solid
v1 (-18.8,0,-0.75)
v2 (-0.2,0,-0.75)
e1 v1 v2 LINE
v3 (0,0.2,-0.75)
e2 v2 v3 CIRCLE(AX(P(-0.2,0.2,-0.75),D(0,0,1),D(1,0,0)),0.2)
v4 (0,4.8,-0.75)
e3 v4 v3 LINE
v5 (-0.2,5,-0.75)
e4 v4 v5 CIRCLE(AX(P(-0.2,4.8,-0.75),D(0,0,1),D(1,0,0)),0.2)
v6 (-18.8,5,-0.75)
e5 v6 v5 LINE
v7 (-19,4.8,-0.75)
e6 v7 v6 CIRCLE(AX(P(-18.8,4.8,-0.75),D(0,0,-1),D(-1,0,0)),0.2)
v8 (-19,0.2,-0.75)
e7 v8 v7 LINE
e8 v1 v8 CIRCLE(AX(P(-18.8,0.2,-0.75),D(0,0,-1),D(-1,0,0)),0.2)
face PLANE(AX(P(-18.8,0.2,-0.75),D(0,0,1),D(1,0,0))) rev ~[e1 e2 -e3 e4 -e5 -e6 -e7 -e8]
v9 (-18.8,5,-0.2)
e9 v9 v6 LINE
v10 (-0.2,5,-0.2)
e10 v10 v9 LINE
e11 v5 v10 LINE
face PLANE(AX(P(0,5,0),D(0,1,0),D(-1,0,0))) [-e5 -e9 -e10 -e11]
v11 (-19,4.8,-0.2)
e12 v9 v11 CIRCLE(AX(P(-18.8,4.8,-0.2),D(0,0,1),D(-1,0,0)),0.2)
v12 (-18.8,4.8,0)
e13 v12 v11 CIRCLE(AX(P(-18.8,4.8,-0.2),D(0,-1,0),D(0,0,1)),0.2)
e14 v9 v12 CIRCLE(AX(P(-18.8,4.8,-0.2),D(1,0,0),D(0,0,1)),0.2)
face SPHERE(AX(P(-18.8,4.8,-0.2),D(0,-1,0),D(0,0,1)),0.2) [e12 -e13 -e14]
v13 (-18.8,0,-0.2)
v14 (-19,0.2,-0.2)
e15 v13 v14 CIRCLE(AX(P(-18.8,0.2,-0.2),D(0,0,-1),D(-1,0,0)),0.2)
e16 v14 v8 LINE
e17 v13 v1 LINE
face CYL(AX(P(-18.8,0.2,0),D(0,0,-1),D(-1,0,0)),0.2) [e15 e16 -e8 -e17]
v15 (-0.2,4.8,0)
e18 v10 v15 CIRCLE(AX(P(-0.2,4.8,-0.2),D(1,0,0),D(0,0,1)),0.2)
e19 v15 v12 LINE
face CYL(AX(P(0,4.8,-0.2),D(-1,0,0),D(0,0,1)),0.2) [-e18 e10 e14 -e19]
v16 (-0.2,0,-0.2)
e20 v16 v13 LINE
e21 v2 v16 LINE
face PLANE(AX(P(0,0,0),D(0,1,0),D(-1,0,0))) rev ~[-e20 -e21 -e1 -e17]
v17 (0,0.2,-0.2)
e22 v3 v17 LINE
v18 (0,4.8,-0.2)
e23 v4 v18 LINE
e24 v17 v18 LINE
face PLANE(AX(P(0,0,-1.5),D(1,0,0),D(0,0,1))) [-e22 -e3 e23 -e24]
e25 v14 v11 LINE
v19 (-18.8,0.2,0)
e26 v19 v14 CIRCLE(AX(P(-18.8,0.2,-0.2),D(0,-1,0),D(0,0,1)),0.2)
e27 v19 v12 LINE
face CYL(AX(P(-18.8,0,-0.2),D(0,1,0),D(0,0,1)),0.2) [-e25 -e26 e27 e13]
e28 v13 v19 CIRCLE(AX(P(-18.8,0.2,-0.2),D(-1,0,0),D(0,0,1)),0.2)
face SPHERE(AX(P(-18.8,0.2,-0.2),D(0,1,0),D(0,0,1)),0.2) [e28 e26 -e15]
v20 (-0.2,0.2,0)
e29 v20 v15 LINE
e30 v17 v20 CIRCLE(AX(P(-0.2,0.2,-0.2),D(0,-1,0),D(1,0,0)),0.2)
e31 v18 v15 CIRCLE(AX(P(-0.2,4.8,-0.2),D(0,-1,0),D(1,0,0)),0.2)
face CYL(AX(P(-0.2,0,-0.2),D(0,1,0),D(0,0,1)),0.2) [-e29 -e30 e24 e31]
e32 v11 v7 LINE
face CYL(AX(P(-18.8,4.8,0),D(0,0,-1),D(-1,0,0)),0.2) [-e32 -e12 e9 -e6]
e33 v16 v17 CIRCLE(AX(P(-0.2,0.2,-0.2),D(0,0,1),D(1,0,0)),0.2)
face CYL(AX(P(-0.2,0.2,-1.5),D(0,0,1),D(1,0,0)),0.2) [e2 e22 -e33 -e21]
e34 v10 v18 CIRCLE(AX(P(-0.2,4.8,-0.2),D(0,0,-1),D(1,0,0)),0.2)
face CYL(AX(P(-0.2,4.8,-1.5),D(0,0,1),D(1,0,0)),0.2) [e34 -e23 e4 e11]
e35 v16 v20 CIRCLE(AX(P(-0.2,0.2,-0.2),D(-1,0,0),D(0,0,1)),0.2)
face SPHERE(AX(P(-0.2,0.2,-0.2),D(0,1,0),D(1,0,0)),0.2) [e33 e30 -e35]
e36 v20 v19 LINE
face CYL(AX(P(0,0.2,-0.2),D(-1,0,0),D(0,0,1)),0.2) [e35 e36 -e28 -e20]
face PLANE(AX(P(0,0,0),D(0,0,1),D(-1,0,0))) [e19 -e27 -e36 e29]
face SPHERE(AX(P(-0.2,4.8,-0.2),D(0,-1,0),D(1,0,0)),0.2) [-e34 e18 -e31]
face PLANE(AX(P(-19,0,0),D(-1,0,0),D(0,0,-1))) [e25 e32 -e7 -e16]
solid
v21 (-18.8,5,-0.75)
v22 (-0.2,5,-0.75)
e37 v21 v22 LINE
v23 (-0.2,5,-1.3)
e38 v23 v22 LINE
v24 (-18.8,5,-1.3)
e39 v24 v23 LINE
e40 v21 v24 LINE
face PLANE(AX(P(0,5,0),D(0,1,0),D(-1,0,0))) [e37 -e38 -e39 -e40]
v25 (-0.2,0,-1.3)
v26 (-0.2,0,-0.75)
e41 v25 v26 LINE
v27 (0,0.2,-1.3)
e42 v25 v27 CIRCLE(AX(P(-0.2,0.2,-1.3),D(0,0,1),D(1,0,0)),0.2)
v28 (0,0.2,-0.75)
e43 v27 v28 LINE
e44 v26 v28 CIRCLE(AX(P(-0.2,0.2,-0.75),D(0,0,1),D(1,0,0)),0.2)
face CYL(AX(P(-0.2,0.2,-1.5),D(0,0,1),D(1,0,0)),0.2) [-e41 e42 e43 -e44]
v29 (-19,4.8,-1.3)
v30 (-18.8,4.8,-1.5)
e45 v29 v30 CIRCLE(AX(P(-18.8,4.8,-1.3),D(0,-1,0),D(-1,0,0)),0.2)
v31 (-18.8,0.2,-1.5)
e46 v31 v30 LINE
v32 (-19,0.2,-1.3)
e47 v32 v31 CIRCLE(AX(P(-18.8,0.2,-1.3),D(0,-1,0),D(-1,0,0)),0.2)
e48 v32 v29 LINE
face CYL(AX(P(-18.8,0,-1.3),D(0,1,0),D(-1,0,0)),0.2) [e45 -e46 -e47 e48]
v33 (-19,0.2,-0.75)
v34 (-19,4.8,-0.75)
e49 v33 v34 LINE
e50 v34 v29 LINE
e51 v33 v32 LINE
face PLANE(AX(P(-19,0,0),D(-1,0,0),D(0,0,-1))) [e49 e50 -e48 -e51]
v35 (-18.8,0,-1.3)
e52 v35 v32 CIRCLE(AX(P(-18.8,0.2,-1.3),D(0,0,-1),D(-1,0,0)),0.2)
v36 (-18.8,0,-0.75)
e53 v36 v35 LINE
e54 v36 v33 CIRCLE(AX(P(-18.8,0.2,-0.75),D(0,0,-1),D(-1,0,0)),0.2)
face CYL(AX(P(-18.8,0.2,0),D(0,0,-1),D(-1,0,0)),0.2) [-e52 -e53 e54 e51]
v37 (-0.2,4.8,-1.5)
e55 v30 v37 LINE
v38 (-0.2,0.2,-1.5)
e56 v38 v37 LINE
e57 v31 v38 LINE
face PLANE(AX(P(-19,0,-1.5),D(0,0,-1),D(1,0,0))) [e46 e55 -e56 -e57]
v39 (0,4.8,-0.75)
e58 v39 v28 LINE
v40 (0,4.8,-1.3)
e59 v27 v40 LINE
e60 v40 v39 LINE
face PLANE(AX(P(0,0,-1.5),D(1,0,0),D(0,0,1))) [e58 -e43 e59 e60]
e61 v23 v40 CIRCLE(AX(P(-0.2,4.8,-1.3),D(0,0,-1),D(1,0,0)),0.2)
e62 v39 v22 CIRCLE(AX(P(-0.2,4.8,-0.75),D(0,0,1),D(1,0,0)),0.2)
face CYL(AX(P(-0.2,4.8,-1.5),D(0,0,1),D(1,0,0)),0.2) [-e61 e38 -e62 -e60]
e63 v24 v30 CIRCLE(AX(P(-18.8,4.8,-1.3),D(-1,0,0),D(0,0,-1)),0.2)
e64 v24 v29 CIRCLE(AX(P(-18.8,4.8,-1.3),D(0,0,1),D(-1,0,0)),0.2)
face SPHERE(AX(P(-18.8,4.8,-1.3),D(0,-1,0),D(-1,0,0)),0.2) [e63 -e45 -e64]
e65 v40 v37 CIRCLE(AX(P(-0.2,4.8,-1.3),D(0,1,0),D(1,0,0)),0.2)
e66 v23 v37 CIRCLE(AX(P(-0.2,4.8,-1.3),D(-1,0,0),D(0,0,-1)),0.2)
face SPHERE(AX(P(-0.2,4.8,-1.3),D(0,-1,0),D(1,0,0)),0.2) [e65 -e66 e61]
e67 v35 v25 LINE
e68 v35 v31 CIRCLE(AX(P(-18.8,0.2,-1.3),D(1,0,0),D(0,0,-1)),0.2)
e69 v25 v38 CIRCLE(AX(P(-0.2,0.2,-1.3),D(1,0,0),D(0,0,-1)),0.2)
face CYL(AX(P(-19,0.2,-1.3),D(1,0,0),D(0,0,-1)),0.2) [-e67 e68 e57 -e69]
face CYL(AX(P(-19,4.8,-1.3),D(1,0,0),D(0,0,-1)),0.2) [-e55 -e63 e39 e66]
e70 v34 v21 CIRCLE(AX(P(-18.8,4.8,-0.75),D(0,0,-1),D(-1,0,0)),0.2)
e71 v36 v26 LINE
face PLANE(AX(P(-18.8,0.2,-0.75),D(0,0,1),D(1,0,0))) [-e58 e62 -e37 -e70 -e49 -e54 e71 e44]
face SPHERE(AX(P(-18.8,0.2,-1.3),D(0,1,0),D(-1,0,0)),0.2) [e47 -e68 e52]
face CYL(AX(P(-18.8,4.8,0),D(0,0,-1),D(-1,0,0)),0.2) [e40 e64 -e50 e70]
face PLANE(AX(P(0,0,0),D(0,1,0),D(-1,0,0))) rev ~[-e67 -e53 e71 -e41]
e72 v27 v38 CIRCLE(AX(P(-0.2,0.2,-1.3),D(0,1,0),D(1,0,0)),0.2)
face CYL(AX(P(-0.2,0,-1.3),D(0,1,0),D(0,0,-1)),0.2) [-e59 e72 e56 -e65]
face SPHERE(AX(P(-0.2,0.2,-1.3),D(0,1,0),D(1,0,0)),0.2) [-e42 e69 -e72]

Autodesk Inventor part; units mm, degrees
ref_plane "YZ Plane" through (0, 0, 0) normal (1, 0, 0) x (0, 1, 0)
ref_plane "XZ Plane" through (0, 0, 0) normal (0, 1, 0) x (-1, 0, 0)
sketch "Sketch1" plane through (0, 0, 0) normal (0, 1, 0) x (-1, 0, 0)
  line L0 (0, 0) -> (19, 0)
  line L1 (19, 0) -> (19, -1.5)
  line L2 (19, -1.5) -> (0, -1.5)
  line L3 (0, -1.5) -> (0, 0)
  dimension "d0" = 19
  dimension "d1" = 1.5
extrude "Extrusion1" add sketch "Sketch1" along normal blind 5
fillet "Fillet1" radius 0.2 12 edges at (0, 2.5, 0) (0, 2.5, -1.5) (0, 0, -0.75) (0, 5, -0.75) (-19, 2.5, 0) (-9.5, 0, 0) (-9.5, 5, 0) (-19, 2.5, -1.5) (-19, 0, -0.75) (-19, 5, -0.75) (-9.5, 0, -1.5) (-9.5, 5, -1.5)
ref_plane "Work Plane1" through (-18.8, 0.2, -0.75) normal (0, 0, 1) x (1, 0, 0)
split body "Split1" result two bodies by plane through (-18.8, 0.2, -0.75) normal (0, 0, 1) first body at (-6.4, 1.6667, -0.25)
properties part number "Magnet"
